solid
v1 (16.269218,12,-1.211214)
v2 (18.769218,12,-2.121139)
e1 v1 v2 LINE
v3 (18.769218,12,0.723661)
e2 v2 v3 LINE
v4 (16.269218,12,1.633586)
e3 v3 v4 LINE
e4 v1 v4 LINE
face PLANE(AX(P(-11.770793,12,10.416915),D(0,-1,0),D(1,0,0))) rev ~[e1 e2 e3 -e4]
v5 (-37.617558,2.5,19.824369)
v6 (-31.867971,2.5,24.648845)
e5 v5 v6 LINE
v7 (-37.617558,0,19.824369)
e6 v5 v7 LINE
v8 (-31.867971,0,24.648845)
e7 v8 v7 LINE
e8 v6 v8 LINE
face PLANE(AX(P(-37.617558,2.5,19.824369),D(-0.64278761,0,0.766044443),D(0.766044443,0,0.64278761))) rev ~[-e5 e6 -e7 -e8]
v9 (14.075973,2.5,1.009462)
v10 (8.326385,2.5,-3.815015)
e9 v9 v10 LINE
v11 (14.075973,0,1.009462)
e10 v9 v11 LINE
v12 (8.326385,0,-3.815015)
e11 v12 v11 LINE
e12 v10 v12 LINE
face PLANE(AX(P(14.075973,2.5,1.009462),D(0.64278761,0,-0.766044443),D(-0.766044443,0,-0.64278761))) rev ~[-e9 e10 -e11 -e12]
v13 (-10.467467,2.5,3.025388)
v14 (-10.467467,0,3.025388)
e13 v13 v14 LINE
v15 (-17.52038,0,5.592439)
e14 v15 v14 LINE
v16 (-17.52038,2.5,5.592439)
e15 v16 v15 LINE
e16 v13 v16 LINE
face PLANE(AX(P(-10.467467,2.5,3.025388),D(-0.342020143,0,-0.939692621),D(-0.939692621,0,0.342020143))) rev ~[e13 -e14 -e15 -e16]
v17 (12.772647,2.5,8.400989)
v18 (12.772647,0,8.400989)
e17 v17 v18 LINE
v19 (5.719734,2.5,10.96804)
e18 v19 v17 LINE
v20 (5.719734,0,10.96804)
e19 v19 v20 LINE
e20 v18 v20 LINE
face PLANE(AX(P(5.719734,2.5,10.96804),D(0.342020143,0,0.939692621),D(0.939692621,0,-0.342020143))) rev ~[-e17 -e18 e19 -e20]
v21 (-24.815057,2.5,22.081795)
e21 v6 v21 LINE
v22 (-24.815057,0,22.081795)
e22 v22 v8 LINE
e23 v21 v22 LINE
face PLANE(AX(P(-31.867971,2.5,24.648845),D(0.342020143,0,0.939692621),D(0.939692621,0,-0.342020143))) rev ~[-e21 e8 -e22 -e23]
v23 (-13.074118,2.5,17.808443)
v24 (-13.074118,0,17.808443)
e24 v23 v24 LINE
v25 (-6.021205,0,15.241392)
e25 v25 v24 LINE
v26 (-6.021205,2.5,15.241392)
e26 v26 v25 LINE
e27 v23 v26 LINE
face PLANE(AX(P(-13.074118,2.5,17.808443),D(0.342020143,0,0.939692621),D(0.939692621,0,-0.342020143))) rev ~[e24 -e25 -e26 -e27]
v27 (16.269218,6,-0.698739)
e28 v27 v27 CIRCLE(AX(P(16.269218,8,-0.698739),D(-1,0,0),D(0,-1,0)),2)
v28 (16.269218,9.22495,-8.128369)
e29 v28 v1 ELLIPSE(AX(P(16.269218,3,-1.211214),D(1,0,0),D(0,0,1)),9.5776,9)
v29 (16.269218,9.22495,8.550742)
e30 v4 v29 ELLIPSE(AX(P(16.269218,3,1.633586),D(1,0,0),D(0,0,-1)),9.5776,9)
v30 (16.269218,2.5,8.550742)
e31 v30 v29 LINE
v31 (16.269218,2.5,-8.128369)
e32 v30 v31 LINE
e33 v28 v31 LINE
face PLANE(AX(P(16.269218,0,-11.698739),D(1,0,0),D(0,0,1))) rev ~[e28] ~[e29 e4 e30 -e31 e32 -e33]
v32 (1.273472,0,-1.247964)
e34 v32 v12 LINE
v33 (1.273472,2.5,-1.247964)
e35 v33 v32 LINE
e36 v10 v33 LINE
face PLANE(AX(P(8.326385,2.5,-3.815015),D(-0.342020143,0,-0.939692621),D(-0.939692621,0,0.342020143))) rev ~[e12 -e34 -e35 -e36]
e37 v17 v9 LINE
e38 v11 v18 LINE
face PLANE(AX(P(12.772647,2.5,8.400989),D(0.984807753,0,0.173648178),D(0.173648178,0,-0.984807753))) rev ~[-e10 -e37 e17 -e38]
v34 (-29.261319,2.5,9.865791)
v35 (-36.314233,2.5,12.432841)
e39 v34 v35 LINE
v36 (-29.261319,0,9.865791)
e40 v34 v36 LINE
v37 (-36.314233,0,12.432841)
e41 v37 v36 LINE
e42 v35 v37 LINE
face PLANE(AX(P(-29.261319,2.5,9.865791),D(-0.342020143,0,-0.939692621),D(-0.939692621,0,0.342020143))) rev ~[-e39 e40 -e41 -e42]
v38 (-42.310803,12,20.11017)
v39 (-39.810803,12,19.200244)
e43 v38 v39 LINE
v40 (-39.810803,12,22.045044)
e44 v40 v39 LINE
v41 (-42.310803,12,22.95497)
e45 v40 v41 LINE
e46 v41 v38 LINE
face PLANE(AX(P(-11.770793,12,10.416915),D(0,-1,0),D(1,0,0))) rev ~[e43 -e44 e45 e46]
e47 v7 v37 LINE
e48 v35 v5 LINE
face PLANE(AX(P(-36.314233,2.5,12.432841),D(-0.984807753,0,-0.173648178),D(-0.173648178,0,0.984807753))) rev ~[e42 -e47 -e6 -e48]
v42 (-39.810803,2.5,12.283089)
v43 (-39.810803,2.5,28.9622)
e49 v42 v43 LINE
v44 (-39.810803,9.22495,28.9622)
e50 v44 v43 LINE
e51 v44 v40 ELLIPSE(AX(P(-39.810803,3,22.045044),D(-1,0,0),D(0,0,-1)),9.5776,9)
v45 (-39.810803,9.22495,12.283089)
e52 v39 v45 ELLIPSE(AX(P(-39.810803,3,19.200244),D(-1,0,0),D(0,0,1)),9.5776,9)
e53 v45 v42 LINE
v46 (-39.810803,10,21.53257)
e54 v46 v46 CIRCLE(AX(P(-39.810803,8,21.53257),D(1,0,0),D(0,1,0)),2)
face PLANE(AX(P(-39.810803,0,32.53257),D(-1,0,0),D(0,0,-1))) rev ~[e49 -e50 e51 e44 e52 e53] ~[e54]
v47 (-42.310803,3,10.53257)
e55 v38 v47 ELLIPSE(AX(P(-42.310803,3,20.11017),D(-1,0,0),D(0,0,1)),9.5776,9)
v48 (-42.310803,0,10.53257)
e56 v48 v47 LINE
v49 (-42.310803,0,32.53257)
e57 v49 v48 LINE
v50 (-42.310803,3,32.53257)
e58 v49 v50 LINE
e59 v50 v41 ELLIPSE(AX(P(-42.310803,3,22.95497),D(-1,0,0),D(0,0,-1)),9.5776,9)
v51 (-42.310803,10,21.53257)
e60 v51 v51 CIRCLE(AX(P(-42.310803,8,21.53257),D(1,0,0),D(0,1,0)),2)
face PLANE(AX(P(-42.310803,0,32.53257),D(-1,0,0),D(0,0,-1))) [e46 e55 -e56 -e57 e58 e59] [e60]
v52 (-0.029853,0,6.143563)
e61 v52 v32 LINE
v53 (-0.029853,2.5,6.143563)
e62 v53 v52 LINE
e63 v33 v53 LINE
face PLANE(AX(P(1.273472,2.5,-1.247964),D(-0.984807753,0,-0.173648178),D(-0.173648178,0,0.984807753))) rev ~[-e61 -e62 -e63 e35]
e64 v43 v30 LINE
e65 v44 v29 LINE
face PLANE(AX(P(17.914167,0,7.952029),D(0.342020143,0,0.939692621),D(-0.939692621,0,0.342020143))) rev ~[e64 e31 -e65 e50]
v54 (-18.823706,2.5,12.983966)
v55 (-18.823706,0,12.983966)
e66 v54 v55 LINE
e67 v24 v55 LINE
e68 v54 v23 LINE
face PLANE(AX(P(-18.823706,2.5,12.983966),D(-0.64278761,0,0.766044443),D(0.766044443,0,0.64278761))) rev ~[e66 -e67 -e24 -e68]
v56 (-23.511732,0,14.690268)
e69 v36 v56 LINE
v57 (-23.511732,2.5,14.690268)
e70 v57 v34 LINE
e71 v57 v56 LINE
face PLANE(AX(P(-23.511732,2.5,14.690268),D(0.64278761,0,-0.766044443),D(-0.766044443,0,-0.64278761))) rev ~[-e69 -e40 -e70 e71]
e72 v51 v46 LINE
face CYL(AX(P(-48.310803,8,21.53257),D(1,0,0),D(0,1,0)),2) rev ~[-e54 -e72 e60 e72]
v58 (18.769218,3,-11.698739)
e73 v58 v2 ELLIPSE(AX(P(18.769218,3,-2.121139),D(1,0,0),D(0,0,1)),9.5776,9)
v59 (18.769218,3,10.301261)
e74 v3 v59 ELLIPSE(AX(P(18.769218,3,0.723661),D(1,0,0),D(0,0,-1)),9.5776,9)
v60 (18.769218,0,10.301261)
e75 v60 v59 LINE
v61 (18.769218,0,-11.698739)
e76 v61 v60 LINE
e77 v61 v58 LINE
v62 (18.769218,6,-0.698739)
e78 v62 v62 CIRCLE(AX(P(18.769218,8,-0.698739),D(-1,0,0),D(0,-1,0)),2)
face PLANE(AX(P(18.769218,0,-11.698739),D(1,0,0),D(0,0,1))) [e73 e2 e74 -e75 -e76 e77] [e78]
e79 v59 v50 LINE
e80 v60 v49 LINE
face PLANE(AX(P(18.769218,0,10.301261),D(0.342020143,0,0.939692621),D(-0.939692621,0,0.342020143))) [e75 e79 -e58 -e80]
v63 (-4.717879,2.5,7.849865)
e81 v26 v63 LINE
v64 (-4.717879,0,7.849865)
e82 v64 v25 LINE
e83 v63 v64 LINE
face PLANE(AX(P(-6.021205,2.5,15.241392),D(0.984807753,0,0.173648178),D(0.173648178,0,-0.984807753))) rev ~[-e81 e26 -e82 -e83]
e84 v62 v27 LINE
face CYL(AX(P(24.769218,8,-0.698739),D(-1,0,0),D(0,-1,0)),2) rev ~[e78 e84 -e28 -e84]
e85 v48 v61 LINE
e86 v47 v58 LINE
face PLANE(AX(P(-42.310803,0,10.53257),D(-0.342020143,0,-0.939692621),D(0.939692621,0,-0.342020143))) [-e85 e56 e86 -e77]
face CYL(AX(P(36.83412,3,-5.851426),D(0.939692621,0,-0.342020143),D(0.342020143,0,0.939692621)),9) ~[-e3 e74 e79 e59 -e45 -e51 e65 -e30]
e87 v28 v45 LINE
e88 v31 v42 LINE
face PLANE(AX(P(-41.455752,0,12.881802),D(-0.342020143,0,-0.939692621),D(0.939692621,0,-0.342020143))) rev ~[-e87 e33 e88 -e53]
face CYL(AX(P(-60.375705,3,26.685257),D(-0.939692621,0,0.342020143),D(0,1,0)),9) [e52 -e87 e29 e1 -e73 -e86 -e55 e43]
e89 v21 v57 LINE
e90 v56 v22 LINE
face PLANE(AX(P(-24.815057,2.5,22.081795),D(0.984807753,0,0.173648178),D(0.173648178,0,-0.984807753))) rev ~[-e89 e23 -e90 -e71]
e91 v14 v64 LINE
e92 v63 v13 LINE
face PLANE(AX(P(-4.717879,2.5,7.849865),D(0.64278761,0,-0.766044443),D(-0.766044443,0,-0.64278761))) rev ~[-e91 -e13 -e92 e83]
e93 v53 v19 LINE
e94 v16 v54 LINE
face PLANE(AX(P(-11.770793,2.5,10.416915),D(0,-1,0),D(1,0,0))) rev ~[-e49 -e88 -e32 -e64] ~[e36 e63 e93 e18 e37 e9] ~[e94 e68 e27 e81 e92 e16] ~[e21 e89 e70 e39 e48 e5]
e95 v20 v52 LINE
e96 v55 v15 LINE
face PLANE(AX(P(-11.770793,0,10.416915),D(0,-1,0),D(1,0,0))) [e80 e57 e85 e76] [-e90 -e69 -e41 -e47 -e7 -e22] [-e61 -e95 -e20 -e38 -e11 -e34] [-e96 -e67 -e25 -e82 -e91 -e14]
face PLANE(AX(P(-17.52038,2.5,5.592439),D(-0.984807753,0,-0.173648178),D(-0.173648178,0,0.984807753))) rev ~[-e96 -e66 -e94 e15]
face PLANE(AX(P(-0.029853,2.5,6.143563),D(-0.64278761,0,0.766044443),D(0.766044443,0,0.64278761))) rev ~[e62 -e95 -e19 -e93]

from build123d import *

# Parameters (mm, degrees)
F1_DEPTH    = 12
F2_T        = -2.5
F4_D        = 4
F4_DEPTH    = 6
F4_TIP      = 1.2017212381
F6_D        = 4
F6_DEPTH    = 6
F6_TIP      = 1.2017212381
F8_DEPTH    = 25
F9_T1_DEPTH = 110
F9_T3_DEPTH = 110


# Not quite as in the source:
# - a fillet or chamfer that OpenCascade refuses, or shapes differently, is made with other operations: its cross-section is extruded or revolved along the edge and cut away or added


with BuildPart() as f1:
    # F0 (on Front) → F1 (new body)
    with BuildSketch(Plane.XZ):
        Polygon((18.7692175617, 10.3012606697), (-42.3108027894, 32.5325699859), (-42.3108027894, 10.5325699859), (18.7692175617, -11.6987393303), align=None)
    extrude(amount=-F1_DEPTH)

    # F2
    f2_openings = [f1.faces().sort_by_distance(p)[0] for p in [
        (-11.770793, 12, 10.416915),
    ]]
    offset(amount=F2_T, openings=f2_openings)

    # F4
    with Locations(Plane.YZ.offset(18.7692175617)):
        with Locations((8, -0.6987393303)):
            Hole(F4_D / 2, depth=F4_DEPTH)
            with Locations((0, 0, -(F4_DEPTH + F4_TIP / 2))):  # 118° drill point
                Cone(0, F4_D / 2, F4_TIP, mode=Mode.SUBTRACT)

    # F6
    with Locations(Plane(origin=(-42.3108027894, 0, 0), x_dir=(0, -1, 0), z_dir=(-1, 0, 0))):
        with Locations((-8, 21.5325699859)):
            Hole(F6_D / 2, depth=F6_DEPTH)
            with Locations((0, 0, -(F6_DEPTH + F6_TIP / 2))):  # 118° drill point
                Cone(0, F6_D / 2, F6_TIP, mode=Mode.SUBTRACT)

    # F7 (on face) → F8 (cut)
    with BuildSketch(Plane(origin=(0, 2.5, 0), x_dir=(-1, 0, 0), z_dir=(0, 1, 0))):
        Polygon((-1.2734722511, -1.247964332), (0.0298534365, 6.1435629449), (-5.7197341143, 10.9680397382), (-12.7726473527, 8.4009892546), (-14.0759730402, 1.0094619776), (-8.3263854894, -3.8150148157), align=None)
        Polygon((10.4674669263, 3.0253880509), (17.5203801646, 5.5924385345), (18.8237058522, 12.9839658114), (13.0741183014, 17.8084426047), (6.021205063, 15.2413921211), (4.7178793755, 7.8498648442), align=None)
        Polygon((29.261319342, 9.8657909174), (36.3142325804, 12.432841401), (37.6175582679, 19.8243686779), (31.8679707171, 24.6488454712), (24.8150574788, 22.0817949876), (23.5117317912, 14.6902677107), align=None)
    extrude(amount=-F8_DEPTH, mode=Mode.SUBTRACT)

    # F9: fillet of radius 9 on 2 edges, made by hand

    # F9_s2 → F9_t1 (cut)
    with BuildSketch(Plane(origin=(34.4059587946, 0, -12.5227448826), x_dir=(0, 1, 0), z_dir=(-0.9396926208, 0, 0.3420201433))):
        with BuildLine():
            ThreePointArc((3, -16.0994691167), (9.3639610307, -13.4634301474), (12, -7.0994691167))
            Line((12, -7.0994691167), (12, -16.0994691167))
            Line((12, -16.0994691167), (3, -16.0994691167))
        make_face()
    extrude(amount=F9_T1_DEPTH, mode=Mode.SUBTRACT)

    # F9_s4 → F9_t3 (cut)
    with BuildSketch(Plane(origin=(-61.8895657853, 0, 22.5259597575), x_dir=(0, 1, 0), z_dir=(0.9396926208, 0, -0.3420201433))):
        with BuildLine():
            ThreePointArc((12, 4.4262314594), (9.3639610307, -1.9377295713), (3, -4.5737685406))
            Line((3, -4.5737685406), (12, -4.5737685406))
            Line((12, -4.5737685406), (12, 4.4262314594))
        make_face()
    extrude(amount=F9_T3_DEPTH, mode=Mode.SUBTRACT)


solid = f1.part
